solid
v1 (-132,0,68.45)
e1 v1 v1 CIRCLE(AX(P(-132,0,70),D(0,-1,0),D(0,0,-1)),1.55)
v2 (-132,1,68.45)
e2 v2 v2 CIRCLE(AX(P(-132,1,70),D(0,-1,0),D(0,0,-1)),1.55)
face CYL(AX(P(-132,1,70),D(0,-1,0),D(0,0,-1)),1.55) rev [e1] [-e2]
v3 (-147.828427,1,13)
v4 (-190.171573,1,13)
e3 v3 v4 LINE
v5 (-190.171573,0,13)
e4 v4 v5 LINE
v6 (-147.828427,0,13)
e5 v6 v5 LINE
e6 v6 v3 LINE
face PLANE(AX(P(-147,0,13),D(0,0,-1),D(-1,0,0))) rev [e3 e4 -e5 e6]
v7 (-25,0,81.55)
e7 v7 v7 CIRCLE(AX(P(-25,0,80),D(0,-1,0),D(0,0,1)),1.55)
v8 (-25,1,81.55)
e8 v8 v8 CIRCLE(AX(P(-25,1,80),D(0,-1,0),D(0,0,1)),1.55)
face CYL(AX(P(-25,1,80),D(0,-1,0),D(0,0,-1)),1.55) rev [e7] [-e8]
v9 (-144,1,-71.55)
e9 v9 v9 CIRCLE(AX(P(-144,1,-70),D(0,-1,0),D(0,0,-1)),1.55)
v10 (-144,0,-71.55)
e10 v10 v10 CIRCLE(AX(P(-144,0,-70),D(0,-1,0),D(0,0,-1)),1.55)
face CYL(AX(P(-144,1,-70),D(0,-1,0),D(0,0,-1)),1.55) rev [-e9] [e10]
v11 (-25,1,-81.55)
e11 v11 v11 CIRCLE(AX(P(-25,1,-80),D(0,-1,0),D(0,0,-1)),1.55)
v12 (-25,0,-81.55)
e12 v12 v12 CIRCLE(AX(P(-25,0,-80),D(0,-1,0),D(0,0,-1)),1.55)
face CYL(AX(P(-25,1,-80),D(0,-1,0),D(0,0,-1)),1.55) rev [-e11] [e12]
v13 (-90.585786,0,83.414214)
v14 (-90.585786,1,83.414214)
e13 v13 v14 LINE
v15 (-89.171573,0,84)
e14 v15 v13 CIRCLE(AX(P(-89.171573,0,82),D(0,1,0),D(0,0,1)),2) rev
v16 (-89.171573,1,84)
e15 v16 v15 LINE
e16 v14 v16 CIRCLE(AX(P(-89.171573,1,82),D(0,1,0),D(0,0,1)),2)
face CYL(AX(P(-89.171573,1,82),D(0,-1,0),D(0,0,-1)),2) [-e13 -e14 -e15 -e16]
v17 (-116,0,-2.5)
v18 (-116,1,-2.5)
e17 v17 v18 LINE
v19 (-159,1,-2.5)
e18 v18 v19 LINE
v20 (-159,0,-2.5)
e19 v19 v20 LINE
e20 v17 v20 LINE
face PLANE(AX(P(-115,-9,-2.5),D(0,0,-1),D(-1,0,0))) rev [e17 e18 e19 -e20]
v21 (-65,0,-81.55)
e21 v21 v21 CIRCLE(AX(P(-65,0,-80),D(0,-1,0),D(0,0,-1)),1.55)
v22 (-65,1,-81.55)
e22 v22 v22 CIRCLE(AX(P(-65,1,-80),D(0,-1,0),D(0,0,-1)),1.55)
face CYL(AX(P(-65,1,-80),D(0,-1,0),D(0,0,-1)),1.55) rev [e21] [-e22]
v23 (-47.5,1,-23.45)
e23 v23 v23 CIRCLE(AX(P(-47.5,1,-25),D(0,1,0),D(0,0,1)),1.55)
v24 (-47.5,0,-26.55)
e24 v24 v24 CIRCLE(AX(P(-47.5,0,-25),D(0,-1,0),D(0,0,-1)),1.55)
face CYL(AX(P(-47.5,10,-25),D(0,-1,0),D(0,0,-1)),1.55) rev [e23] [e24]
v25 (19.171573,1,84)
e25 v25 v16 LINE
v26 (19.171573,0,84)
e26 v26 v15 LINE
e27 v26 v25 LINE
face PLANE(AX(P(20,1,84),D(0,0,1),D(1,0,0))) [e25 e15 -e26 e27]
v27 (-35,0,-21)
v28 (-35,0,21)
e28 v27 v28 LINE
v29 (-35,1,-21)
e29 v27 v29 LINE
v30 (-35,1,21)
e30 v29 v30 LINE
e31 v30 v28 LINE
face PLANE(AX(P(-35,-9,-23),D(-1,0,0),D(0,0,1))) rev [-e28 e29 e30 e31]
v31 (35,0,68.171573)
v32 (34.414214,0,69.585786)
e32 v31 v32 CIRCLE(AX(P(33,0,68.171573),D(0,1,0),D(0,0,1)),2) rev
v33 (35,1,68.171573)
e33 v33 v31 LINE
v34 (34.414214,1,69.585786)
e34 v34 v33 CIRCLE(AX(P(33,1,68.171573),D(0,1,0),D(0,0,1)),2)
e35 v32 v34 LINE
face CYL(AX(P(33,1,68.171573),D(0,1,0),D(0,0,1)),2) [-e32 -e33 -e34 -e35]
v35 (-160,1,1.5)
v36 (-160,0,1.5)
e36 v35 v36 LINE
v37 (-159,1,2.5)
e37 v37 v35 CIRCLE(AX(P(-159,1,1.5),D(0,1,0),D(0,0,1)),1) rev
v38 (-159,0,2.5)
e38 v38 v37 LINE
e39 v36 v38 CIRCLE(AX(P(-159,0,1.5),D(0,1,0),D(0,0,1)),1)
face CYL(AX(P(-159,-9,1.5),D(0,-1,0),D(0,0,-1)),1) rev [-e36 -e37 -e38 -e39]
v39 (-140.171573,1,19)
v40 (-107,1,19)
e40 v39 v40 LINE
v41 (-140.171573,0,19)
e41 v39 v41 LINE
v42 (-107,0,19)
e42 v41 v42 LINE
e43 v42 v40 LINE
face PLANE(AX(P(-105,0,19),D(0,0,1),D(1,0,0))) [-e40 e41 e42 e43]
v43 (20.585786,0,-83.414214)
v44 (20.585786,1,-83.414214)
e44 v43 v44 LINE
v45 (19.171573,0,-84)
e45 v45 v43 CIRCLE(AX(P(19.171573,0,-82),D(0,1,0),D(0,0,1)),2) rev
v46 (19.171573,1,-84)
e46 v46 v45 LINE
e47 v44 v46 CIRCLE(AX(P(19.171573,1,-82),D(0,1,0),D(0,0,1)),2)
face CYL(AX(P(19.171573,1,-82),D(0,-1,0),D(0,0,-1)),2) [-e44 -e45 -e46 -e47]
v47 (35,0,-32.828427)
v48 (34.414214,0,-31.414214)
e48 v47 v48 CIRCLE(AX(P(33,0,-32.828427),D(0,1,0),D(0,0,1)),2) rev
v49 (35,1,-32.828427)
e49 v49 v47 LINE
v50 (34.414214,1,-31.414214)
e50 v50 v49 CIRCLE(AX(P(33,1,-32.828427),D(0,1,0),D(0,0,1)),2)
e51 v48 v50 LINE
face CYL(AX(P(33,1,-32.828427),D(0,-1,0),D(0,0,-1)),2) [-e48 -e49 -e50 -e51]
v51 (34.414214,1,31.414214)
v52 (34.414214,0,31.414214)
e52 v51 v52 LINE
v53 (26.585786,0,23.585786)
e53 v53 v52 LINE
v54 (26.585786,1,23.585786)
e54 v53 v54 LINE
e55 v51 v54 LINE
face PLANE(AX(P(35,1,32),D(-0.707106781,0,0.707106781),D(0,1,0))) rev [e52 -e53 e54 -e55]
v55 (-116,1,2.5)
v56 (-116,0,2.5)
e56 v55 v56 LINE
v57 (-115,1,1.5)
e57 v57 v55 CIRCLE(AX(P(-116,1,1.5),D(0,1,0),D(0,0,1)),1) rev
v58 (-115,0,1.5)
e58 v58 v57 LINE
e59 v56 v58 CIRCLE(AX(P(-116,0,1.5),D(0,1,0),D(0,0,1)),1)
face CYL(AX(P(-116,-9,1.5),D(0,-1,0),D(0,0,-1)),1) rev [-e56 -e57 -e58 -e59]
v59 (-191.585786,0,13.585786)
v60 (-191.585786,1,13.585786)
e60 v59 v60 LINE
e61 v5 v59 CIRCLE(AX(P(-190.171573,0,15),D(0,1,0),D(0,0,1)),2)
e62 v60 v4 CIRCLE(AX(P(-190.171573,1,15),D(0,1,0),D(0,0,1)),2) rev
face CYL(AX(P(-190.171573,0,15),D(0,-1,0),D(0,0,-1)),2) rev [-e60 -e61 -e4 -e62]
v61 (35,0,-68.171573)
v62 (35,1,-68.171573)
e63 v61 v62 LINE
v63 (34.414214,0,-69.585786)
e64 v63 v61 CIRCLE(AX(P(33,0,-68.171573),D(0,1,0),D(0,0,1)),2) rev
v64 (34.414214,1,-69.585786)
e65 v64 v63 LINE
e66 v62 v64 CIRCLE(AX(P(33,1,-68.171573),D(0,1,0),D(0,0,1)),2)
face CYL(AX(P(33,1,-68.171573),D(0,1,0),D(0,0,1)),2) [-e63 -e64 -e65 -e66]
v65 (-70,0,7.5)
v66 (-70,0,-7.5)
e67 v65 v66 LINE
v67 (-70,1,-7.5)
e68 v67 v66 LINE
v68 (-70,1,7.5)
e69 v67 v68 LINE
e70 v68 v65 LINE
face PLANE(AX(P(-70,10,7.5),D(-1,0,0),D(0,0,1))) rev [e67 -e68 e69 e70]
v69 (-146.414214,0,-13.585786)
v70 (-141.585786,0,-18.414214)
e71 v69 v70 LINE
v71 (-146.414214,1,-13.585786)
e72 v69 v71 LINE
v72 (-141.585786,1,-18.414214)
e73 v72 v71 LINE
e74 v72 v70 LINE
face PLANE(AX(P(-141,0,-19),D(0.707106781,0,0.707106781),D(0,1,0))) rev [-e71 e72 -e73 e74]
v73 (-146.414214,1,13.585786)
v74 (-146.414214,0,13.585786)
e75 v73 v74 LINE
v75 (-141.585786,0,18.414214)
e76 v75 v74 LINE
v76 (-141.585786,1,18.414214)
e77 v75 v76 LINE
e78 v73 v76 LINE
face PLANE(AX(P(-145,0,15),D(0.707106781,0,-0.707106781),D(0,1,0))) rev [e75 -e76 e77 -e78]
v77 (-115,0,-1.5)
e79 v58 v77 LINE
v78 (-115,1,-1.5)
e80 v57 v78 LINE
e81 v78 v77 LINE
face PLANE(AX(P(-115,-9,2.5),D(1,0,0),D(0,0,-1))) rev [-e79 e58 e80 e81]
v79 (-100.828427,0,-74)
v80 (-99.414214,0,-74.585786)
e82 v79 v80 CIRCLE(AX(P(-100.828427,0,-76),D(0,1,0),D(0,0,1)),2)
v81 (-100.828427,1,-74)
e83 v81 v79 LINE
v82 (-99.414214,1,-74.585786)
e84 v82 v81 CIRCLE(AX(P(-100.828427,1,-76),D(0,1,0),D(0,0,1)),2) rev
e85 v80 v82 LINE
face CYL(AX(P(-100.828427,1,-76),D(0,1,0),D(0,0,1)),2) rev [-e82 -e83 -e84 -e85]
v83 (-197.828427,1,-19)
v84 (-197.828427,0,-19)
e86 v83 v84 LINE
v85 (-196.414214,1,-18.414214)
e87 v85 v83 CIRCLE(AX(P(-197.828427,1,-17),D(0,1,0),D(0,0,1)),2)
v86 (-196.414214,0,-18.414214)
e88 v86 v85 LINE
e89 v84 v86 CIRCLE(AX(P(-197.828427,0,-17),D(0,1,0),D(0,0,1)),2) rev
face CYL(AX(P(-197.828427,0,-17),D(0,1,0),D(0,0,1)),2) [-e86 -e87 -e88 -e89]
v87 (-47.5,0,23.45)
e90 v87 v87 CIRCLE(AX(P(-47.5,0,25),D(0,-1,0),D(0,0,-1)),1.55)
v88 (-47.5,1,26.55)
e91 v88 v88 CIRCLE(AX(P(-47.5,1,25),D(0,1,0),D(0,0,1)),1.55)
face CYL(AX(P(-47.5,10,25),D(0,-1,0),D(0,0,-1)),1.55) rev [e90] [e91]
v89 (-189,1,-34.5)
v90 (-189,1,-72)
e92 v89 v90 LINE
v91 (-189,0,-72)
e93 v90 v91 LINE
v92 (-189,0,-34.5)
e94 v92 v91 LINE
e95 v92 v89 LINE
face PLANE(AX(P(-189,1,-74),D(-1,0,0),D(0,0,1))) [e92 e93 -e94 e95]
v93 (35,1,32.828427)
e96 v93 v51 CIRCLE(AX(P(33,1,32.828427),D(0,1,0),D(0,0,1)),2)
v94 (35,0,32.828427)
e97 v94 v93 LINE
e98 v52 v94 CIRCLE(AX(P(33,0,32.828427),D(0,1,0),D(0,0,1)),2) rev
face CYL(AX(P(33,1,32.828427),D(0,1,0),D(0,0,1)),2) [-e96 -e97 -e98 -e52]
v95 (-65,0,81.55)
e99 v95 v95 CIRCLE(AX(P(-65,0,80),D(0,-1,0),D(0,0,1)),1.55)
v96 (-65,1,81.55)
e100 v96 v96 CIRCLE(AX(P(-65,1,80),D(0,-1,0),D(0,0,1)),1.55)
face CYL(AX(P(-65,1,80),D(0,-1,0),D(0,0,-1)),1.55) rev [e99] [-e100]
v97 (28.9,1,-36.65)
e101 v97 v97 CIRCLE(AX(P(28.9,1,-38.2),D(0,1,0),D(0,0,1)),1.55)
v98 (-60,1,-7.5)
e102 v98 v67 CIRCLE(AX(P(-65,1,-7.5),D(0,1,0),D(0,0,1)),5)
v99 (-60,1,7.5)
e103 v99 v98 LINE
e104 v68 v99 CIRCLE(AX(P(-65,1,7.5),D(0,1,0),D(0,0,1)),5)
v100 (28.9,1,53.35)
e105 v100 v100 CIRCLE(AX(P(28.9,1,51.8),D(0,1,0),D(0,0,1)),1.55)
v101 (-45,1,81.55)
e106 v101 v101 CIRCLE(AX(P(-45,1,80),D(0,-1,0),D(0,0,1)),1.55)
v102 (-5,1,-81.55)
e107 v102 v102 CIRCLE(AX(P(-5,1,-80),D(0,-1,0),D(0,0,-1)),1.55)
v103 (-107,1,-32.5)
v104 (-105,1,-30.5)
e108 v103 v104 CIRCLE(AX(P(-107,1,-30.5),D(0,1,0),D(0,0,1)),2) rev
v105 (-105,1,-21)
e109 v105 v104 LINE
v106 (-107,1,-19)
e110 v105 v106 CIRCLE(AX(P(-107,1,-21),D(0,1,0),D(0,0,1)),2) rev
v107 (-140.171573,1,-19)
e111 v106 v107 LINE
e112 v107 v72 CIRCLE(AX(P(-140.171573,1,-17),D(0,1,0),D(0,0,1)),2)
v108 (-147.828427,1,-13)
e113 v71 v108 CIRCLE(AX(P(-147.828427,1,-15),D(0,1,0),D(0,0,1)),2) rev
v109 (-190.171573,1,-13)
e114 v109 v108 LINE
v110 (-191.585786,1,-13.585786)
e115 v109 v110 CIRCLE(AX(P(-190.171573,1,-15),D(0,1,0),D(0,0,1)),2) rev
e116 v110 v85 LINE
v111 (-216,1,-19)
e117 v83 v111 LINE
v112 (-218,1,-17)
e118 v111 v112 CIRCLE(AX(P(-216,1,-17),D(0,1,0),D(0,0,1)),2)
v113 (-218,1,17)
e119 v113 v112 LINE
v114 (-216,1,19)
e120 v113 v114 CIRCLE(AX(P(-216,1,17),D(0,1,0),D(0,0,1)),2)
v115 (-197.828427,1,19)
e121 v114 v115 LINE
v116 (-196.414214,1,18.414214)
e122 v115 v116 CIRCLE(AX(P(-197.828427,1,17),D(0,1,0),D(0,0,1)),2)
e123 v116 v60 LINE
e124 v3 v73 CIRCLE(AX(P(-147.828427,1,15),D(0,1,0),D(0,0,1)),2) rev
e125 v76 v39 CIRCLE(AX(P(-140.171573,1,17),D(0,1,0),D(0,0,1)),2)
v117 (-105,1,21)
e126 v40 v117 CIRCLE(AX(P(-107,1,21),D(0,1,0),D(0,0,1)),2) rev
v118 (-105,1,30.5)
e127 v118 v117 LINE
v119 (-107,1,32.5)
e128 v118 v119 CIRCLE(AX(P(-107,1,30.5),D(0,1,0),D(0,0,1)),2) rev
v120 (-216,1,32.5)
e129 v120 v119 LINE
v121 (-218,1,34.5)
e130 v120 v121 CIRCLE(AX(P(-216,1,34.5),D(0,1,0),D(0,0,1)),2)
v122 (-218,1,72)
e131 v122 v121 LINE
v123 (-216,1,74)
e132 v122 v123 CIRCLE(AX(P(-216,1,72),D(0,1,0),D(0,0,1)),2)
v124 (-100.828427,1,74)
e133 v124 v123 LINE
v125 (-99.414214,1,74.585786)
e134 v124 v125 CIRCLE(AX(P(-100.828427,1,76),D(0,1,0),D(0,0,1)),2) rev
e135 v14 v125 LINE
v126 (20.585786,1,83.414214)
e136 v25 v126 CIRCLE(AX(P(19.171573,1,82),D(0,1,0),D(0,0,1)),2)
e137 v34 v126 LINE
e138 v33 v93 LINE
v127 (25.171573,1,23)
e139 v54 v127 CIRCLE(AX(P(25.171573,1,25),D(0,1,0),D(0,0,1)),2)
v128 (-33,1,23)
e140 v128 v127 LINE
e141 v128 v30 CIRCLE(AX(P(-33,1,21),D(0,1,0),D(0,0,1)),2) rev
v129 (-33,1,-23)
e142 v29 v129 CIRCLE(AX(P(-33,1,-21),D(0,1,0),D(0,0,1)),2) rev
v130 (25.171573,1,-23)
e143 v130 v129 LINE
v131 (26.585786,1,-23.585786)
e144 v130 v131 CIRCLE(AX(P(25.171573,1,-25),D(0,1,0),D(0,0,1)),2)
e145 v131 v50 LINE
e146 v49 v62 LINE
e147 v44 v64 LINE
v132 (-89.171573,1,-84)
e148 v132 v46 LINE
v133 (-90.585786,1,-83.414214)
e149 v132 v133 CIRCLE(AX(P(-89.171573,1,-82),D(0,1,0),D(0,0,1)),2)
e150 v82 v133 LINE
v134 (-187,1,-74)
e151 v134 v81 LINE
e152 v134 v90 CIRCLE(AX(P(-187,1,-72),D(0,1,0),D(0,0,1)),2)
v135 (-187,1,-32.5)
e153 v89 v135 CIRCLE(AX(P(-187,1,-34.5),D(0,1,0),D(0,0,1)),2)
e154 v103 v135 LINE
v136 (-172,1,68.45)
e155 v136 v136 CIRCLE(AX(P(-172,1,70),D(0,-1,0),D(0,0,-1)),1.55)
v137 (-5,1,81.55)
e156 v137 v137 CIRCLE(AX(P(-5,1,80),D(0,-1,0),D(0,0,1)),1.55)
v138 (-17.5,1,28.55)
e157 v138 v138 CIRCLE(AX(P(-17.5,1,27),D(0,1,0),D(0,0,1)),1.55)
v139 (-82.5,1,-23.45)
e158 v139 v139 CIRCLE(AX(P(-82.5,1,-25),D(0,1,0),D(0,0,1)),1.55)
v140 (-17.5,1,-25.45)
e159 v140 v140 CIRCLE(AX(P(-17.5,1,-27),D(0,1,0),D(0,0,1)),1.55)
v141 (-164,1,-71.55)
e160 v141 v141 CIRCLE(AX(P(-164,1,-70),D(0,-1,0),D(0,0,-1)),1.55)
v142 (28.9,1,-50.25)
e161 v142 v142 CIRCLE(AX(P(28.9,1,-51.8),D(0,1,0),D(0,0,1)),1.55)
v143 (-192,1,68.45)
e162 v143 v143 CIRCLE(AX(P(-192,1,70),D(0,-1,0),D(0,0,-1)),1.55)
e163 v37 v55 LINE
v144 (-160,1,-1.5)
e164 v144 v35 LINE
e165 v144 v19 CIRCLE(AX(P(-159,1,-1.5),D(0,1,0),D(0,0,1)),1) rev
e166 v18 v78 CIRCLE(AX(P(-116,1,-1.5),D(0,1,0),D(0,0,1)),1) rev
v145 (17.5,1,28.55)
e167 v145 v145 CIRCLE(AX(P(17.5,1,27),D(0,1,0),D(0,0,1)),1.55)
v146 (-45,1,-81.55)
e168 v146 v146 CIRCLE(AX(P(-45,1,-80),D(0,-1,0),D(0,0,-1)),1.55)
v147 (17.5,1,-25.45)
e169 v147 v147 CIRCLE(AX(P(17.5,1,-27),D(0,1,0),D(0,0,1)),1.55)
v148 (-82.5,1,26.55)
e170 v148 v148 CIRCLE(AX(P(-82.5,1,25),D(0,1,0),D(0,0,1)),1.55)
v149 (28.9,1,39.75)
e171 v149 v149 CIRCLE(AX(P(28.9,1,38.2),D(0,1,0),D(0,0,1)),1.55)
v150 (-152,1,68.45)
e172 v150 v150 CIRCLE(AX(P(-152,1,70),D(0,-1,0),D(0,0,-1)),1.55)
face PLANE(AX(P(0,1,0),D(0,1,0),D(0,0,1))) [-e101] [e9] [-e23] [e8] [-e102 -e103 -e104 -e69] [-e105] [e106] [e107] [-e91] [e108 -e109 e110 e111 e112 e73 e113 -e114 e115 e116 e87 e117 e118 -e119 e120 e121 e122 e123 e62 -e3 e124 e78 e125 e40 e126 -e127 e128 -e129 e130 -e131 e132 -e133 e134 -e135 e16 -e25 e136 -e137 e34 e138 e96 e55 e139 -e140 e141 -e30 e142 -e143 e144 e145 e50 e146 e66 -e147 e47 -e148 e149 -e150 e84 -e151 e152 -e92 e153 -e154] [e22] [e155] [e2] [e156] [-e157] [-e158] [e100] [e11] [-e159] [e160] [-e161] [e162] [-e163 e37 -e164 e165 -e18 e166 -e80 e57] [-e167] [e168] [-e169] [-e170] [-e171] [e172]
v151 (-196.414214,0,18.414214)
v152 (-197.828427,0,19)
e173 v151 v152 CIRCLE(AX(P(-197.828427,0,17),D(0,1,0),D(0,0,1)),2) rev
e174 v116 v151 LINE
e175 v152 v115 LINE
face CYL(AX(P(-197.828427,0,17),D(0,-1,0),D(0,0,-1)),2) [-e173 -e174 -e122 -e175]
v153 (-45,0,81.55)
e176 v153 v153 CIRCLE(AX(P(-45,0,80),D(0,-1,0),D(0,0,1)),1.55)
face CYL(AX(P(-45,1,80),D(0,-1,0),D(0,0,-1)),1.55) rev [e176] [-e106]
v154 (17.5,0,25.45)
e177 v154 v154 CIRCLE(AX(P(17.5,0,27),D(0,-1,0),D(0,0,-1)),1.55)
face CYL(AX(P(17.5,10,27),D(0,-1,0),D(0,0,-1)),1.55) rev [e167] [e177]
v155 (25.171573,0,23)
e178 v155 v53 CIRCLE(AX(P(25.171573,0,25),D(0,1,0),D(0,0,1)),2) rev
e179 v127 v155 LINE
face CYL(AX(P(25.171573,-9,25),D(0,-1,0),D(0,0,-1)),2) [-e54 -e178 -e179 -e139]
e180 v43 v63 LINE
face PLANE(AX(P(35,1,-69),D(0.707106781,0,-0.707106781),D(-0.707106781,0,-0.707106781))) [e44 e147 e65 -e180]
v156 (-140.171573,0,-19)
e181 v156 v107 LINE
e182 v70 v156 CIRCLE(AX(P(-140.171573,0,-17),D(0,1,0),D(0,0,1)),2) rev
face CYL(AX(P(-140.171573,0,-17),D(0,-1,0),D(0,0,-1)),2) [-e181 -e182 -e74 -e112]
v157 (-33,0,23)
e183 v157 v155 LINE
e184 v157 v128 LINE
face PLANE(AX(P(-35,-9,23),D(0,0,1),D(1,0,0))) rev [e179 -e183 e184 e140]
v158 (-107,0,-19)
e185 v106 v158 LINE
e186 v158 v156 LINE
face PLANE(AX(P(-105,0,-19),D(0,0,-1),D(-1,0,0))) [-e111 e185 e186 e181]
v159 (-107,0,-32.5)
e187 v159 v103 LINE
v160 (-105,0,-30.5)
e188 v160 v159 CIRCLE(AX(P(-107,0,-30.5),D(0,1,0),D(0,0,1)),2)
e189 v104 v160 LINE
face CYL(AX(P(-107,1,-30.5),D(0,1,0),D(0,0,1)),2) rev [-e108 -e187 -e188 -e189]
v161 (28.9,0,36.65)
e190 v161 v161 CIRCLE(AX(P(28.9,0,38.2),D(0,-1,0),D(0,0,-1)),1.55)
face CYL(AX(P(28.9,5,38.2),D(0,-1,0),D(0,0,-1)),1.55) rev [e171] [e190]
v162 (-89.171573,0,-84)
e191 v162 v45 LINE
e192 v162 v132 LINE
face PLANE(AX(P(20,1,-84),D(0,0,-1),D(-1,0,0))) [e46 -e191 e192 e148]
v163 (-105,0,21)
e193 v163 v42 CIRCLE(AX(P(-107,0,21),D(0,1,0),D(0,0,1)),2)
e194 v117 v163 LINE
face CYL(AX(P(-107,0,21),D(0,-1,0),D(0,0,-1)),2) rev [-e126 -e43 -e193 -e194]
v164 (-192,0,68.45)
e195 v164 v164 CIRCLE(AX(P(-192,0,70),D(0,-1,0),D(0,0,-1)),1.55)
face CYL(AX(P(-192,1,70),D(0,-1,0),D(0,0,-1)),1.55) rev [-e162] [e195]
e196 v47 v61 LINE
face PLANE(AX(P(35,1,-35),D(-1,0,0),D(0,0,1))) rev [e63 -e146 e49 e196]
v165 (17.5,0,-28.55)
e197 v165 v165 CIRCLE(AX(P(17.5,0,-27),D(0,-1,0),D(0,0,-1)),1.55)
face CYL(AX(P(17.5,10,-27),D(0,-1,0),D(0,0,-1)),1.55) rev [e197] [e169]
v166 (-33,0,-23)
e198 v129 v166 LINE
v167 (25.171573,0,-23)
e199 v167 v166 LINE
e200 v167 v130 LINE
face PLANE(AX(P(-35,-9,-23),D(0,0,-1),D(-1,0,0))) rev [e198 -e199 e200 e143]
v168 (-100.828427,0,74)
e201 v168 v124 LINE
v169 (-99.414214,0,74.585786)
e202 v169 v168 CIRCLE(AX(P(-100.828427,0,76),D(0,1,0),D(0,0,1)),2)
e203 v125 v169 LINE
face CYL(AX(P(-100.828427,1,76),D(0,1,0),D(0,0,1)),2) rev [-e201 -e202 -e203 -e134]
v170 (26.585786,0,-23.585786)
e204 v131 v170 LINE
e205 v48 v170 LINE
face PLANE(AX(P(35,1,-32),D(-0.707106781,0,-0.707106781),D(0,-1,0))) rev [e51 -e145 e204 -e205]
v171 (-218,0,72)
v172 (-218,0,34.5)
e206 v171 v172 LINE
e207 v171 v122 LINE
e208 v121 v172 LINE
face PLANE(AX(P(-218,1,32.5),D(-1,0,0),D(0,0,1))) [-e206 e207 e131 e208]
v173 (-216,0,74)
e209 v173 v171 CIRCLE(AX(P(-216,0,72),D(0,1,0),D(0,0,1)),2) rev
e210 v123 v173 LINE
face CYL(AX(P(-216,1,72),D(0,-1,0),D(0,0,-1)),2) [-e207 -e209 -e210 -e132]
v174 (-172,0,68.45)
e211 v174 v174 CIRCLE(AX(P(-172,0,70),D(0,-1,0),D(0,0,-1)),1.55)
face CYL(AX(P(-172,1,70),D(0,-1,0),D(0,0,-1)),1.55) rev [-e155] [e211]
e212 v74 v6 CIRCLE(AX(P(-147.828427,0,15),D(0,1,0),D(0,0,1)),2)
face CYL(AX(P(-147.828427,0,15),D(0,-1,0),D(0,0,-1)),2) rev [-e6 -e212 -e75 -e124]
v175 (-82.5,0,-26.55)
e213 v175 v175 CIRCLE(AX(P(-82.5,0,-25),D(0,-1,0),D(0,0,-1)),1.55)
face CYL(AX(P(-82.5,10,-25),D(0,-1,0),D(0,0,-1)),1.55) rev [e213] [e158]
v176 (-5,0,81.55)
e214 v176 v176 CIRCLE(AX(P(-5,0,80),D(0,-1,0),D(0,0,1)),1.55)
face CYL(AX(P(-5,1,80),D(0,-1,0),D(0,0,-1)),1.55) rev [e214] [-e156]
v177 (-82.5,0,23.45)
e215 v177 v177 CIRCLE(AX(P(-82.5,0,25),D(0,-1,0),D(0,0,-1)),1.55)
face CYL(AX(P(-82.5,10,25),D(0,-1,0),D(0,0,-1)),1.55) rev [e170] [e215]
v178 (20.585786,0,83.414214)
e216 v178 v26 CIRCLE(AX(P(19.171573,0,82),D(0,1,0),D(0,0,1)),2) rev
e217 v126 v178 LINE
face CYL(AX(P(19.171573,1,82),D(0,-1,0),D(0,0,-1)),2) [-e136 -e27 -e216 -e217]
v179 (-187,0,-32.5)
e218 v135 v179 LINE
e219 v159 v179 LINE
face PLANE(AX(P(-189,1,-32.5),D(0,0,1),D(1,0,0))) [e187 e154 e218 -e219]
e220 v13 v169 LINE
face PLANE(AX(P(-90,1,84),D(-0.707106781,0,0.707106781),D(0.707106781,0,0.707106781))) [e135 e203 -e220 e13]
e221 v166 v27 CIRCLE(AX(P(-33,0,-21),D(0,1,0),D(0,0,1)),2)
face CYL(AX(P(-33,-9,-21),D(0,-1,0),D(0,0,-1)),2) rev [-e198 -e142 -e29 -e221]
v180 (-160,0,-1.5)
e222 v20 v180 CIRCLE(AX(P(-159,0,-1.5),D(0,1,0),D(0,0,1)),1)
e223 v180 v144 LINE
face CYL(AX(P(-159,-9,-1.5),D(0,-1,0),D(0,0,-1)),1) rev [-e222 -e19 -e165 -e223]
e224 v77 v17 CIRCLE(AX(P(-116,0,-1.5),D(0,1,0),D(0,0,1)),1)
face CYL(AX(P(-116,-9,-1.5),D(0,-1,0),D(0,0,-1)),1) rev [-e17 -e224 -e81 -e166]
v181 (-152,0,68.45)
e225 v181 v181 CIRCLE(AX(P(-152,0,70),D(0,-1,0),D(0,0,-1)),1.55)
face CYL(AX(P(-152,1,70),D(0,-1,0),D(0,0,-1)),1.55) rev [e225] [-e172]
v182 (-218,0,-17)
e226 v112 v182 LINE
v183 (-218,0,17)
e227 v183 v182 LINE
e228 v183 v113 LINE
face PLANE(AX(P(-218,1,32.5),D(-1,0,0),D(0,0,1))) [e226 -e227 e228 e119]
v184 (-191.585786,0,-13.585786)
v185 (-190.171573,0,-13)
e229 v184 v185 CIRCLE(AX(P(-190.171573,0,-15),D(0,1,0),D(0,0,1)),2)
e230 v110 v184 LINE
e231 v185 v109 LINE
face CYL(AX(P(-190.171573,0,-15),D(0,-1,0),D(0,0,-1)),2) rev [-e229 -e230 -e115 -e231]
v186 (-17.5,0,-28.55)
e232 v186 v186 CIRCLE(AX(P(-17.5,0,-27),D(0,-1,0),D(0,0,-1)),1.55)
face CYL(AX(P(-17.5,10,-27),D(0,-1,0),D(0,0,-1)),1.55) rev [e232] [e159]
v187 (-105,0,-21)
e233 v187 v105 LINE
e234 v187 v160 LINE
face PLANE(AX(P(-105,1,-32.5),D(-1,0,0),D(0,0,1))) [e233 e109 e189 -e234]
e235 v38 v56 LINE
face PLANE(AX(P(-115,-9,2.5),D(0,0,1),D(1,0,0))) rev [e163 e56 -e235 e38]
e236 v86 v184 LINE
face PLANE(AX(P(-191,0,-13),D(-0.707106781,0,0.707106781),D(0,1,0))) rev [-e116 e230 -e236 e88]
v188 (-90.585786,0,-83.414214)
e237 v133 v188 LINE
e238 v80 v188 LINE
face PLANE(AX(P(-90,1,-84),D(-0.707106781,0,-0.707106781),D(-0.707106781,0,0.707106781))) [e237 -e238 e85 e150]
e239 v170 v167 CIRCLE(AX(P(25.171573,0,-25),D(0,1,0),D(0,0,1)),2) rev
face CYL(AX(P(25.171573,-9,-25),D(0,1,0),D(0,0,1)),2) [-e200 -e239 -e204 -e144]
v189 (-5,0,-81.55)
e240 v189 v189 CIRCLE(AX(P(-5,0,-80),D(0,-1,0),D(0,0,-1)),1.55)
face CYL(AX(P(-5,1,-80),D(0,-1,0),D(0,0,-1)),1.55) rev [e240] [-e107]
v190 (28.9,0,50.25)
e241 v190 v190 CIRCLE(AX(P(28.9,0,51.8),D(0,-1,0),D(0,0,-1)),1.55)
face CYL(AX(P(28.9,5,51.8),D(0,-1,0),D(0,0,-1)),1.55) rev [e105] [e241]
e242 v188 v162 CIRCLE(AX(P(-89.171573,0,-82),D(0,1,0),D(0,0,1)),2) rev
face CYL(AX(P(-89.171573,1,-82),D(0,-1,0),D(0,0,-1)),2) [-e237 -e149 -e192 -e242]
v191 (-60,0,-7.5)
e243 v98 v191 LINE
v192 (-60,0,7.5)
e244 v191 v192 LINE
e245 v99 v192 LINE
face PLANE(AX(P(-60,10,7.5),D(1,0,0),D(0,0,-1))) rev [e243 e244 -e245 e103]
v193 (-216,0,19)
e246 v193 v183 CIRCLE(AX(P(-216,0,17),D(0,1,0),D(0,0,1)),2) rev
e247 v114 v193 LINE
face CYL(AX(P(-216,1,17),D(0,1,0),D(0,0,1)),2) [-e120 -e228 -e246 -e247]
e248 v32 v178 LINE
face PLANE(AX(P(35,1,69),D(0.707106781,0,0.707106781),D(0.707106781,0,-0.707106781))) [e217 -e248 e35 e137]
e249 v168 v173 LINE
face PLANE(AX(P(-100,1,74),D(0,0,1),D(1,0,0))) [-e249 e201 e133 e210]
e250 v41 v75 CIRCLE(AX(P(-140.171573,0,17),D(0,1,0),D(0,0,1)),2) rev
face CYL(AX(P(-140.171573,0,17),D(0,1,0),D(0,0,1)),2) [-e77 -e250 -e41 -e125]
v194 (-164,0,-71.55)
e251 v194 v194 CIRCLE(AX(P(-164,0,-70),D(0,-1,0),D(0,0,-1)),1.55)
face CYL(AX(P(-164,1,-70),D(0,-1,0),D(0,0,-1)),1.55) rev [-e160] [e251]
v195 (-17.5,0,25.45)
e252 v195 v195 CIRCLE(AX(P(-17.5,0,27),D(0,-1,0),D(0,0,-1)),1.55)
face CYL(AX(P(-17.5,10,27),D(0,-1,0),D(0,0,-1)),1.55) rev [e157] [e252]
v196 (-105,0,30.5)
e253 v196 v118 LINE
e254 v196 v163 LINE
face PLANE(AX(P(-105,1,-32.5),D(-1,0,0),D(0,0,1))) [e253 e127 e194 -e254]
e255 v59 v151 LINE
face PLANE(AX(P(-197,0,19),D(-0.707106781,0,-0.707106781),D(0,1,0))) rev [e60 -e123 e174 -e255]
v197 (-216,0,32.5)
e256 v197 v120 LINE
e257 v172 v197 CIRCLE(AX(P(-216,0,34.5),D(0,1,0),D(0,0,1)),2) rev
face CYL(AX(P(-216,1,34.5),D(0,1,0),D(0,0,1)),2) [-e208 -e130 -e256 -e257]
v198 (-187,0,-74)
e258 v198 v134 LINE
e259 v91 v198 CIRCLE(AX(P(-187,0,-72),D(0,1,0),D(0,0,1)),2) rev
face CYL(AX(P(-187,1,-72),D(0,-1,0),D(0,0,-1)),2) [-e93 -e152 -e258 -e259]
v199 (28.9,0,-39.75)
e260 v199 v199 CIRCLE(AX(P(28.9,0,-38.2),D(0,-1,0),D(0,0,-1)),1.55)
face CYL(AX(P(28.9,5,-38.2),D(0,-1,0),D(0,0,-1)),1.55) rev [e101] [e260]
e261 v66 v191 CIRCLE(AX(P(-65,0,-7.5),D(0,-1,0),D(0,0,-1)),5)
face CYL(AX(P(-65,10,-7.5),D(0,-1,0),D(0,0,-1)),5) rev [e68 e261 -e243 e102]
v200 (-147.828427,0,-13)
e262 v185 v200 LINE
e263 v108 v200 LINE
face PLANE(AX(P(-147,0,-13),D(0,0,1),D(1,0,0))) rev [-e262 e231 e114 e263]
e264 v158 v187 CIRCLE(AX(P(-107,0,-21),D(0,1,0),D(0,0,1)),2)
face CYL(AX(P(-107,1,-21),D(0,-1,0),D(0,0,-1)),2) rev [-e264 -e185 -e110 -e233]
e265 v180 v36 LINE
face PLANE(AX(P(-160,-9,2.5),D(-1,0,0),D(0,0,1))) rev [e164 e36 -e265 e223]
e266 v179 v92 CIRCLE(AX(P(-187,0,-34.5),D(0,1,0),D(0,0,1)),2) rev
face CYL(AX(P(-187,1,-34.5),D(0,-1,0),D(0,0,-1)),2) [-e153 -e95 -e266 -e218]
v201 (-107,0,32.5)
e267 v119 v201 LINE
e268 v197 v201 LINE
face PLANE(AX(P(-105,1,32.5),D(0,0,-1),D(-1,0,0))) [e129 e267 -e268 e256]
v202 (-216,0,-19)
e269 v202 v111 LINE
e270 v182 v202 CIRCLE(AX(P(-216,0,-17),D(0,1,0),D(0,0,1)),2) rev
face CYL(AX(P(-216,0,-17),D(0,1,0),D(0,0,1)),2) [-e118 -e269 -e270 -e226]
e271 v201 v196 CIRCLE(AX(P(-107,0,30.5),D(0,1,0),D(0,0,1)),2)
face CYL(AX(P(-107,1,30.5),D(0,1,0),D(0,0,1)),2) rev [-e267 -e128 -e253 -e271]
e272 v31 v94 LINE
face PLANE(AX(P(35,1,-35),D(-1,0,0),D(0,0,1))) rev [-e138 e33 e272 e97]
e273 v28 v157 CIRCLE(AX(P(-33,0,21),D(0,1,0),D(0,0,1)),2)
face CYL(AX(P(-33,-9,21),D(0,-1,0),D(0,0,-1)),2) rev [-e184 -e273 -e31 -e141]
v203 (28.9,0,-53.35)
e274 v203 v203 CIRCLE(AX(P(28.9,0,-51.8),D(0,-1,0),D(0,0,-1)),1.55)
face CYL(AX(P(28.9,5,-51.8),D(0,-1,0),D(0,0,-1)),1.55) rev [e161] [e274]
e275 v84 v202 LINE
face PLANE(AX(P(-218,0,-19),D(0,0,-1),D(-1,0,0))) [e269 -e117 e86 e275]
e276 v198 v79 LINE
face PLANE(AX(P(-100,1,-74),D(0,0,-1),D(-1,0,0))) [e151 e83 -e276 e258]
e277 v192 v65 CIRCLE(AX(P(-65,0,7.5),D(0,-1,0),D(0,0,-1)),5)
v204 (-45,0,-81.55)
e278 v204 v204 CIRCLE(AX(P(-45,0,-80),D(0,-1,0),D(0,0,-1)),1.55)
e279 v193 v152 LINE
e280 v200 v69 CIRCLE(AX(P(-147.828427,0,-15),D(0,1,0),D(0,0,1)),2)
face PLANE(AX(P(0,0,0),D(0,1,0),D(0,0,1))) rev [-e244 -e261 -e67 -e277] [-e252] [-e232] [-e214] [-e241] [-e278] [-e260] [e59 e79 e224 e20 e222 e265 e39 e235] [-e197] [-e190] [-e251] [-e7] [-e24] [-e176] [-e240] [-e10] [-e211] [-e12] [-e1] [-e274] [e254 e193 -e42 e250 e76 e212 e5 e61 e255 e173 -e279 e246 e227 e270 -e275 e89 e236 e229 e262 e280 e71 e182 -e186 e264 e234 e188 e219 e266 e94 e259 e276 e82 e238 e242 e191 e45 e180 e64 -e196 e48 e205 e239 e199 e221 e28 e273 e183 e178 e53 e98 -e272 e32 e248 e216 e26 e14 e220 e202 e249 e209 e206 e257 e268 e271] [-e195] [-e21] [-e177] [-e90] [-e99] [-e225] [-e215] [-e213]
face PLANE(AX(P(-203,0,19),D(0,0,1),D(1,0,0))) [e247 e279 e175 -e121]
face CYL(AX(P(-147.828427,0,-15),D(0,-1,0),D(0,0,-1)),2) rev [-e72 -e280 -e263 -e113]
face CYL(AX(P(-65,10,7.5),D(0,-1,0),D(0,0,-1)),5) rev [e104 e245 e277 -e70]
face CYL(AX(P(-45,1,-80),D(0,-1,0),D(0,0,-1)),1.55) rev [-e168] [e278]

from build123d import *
from build123d.topology import SkipClean

# Parameters (mm, degrees)
SKETCH_1_W          = 70
SKETCH_1_H          = 70
SKETCH_1_R          = 1.6
EXTRUDE_1_DEPTH     = 1
EXTRUDE_2_DEPTH     = 1
SKETCH_5_W          = 113
SKETCH_5_H          = 30
EXTRUDE_5_DEPTH     = 1
SKETCH_6_R          = 1.55
CUT_EXTRUDE_1_DEPTH = 1
SKETCH_7_W          = 15
SKETCH_7_H          = 17.5
EXTRUDE_6_DEPTH     = 1
SKETCH_8_W          = 40
SKETCH_8_H          = 4
SKETCH_8_W_2        = 12
SKETCH_8_W_3        = 27
EXTRUDE_7_DEPTH     = 1
CHAMFER_1_SIZE      = 4
SKETCH_9_W          = 15
SKETCH_9_H          = 13.5
CUT_EXTRUDE_2_DEPTH = 1
CHAMFER_2_SIZE      = 6
SKETCH_10_W         = 45
SKETCH_10_H         = 5
SKETCH_10_W_2       = 70
SKETCH_10_H_2       = 46
CUT_EXTRUDE_3_DEPTH = 10
FILLET_1_R          = 1
SKETCH_11_R         = 1.55
CUT_EXTRUDE_4_DEPTH = 10
CHAMFER_3_SIZE      = 9
FILLET_2_R          = 2
SKETCH_12_R         = 1.55
CUT_EXTRUDE_5_DEPTH = 5
CUT_EXTRUDE_6_DEPTH = 10


# Some blends are built 0.0001 mm under size
with BuildPart() as part:
    # 草图1 → 凸台-拉伸1 (new body)
    with BuildSketch(Plane(origin=(0, 0, 0), x_dir=(1, 0, 0), z_dir=(0, 1, 0))):
        Rectangle(SKETCH_1_W, SKETCH_1_H)
        with Locations(Location((13, -13, 0), (0, 0, 270))):
            Circle(SKETCH_1_R, mode=Mode.SUBTRACT)
        with Locations(Location((13, 13, 0), (0, 0, 270))):
            Circle(SKETCH_1_R, mode=Mode.SUBTRACT)
        with Locations(Location((-13, 13, 0), (0, 0, 270))):
            Circle(SKETCH_1_R, mode=Mode.SUBTRACT)
        with Locations(Location((-13, -13, 0), (0, 0, 270))):
            Circle(SKETCH_1_R, mode=Mode.SUBTRACT)
    extrude(amount=EXTRUDE_1_DEPTH)

    # 草图2 → 凸台-拉伸2 (add)
    with BuildSketch(Plane.XZ):
        Polygon((35, -35), (35, -69), (20, -84), (-90, -84), (-100, -74), (-189, -74), (-189, -32.5), (-105, -32.5), (-105, 32.5), (-218, 32.5), (-218, 74), (-100, 74), (-90, 84), (20, 84), (35, 69), (35, 35), (-35, 35), (-35, -35), align=None)
    extrude(amount=-EXTRUDE_2_DEPTH)

    # 草图5 → 凸台-拉伸5 (add)
    with BuildSketch(Plane(origin=(0, 1, 0), x_dir=(1, 0, 0), z_dir=(0, 1, 0))):
        with Locations((-161.5, 0)):
            Rectangle(SKETCH_5_W, SKETCH_5_H)
    extrude(amount=-EXTRUDE_5_DEPTH)

    # 草图6 → 切除-拉伸1 (cut)
    with BuildSketch(Plane.XZ):
        with Locations(Location((-5, -80, 0), (0, 0, 270))):
            Circle(SKETCH_6_R)
        with Locations(Location((-25, -80, 0), (0, 0, 270))):
            Circle(SKETCH_6_R)
        with Locations(Location((-65, -80, 0), (0, 0, 270))):
            Circle(SKETCH_6_R)
        with Locations(Location((-45, -80, 0), (0, 0, 270))):
            Circle(SKETCH_6_R)
        with Locations(Location((-45, 80, 0), (0, 0, 90))):
            Circle(SKETCH_6_R)
        with Locations(Location((-65, 80, 0), (0, 0, 90))):
            Circle(SKETCH_6_R)
        with Locations(Location((-25, 80, 0), (0, 0, 90))):
            Circle(SKETCH_6_R)
        with Locations(Location((-5, 80, 0), (0, 0, 90))):
            Circle(SKETCH_6_R)
        with Locations(Location((-164, -70, 0), (0, 0, 270))):
            Circle(SKETCH_6_R)
        with Locations(Location((-192, 70, 0), (0, 0, 270))):
            Circle(SKETCH_6_R)
        with Locations(Location((-172, 70, 0), (0, 0, 270))):
            Circle(SKETCH_6_R)
        with Locations(Location((-152, 70, 0), (0, 0, 270))):
            Circle(SKETCH_6_R)
        with Locations(Location((-132, 70, 0), (0, 0, 270))):
            Circle(SKETCH_6_R)
        with Locations(Location((-144, -70, 0), (0, 0, 270))):
            Circle(SKETCH_6_R)
    extrude(amount=-CUT_EXTRUDE_1_DEPTH, mode=Mode.SUBTRACT)

    # 草图7 → 凸台-拉伸6 (add)
    with BuildSketch(Plane.XZ):
        with Locations((-210.5, 23.75)):
            Rectangle(SKETCH_7_W, SKETCH_7_H)
    extrude(amount=-EXTRUDE_6_DEPTH)

    # 草图8 → 凸台-拉伸7 (add)
    with BuildSketch(Plane(origin=(0, 1, 0), x_dir=(1, 0, 0), z_dir=(0, 1, 0))):
        with Locations((-125, 17)):
            Rectangle(SKETCH_8_W, SKETCH_8_H)
        with Locations((-125, -17)):
            Rectangle(SKETCH_8_W, SKETCH_8_H)
        with Locations((-197, -17)):
            Rectangle(SKETCH_8_W_2, SKETCH_8_H)
        with Locations((-204.5, 17)):
            Rectangle(SKETCH_8_W_3, SKETCH_8_H)
    extrude(amount=-EXTRUDE_7_DEPTH)

    # 倒角1
    chamfer_1_edges = [part.edges().sort_by_distance(p)[0] for p in [
        (-145, 0.5, -19),
        (-145, 0.5, 19),
    ]]
    chamfer(chamfer_1_edges, length=CHAMFER_1_SIZE - 0.0001)  # a hair under: the kernel refuses the full size

    # 草图9 → 切除-拉伸2 (cut)
    with SkipClean():  # the faces are left unmerged after this step: merging them gives an invalid solid
        with BuildSketch(Plane(origin=(0, 1, 0), x_dir=(1, 0, 0), z_dir=(0, 1, 0))):
            with Locations((-210.5, -25.75)):
                Rectangle(SKETCH_9_W, SKETCH_9_H)
            Polygon((-145, -15), (-147, -13), (-191, -13), (-191, -15), align=None)
            Polygon((-145, 15), (-191, 15), (-191, 13), (-147, 13), align=None)
        extrude(amount=-CUT_EXTRUDE_2_DEPTH, mode=Mode.SUBTRACT)

    # 倒角2
    # the kernel refuses this chamfer: 6 mm, written as the material it takes off along each edge
    with BuildSketch(Plane(origin=(-191, 16.430097928, -19), x_dir=(0.027495876610586775, 0, 0.9996219169112968), z_dir=(0, -1, 0))) as chamfer_2_piece_1_section:
        Polygon((CHAMFER_2_SIZE * 0.999621916911, CHAMFER_2_SIZE * 0.0274958766106), (-CHAMFER_2_SIZE * 0.0274958766106, CHAMFER_2_SIZE * 0.999621916911), (0, 0), align=None)
    chamfer_2_piece_1 = extrude(amount=31.860195856, mode=Mode.PRIVATE)
    chamfer_2_piece_1 = split(chamfer_2_piece_1, bisect_by=Plane(origin=(-192.982424926, 0.5, -13), z_dir=(0, 0, -1)), keep=Keep.TOP, mode=Mode.PRIVATE)
    add(chamfer_2_piece_1, mode=Mode.SUBTRACT)
    with BuildSketch(Plane(origin=(-191, 16.430097928, 19), x_dir=(-0.9996219169112968, 0, 0.02749587661058619), z_dir=(0, -1, 0))) as chamfer_2_piece_2_section:
        Polygon((CHAMFER_2_SIZE * 0.999621916911, CHAMFER_2_SIZE * 0.0274958766106), (-CHAMFER_2_SIZE * 0.0274958766106, CHAMFER_2_SIZE * 0.999621916911), (0, 0), align=None)
    chamfer_2_piece_2 = extrude(amount=31.860195856, mode=Mode.PRIVATE)
    chamfer_2_piece_2 = split(chamfer_2_piece_2, bisect_by=Plane(origin=(-192.982424926, 0.5, 13), z_dir=(0, 0, 1)), keep=Keep.TOP, mode=Mode.PRIVATE)
    add(chamfer_2_piece_2, mode=Mode.SUBTRACT)

    # 草图10 → 切除-拉伸3 (cut)
    with SkipClean():  # the faces are left unmerged after this step: merging them gives an invalid solid
        with BuildSketch(Plane(origin=(0, 1, 0), x_dir=(1, 0, 0), z_dir=(0, 1, 0))):
            with Locations((-137.5, 0)):
                Rectangle(SKETCH_10_W, SKETCH_10_H)
            Rectangle(SKETCH_10_W_2, SKETCH_10_H_2)
        extrude(amount=-CUT_EXTRUDE_3_DEPTH, mode=Mode.SUBTRACT)

    # 圆角1
    fillet_1_edges = [part.edges().sort_by_distance(p)[0] for p in [
        (-115, 0.5, -2.5),
        (-115, 0.5, 2.5),
        (-160, 0.5, 2.5),
        (-160, 0.5, -2.5),
    ]]
    fillet(fillet_1_edges, radius=FILLET_1_R)

    # 草图11 → 切除-拉伸4 (cut)
    with SkipClean():  # the faces are left unmerged after this step: merging them gives an invalid solid
        with BuildSketch(Plane.XZ):
            with Locations(Location((17.5, -27, 0), (0, 0, 270))):
                Circle(SKETCH_11_R)
            with Locations(Location((17.5, 27, 0), (0, 0, 270))):
                Circle(SKETCH_11_R)
            with Locations(Location((-17.5, 27, 0), (0, 0, 270))):
                Circle(SKETCH_11_R)
            with Locations(Location((-17.5, -27, 0), (0, 0, 270))):
                Circle(SKETCH_11_R)
            with Locations(Location((-47.5, 25, 0), (0, 0, 270))):
                Circle(SKETCH_11_R)
            with Locations(Location((-47.5, -25, 0), (0, 0, 270))):
                Circle(SKETCH_11_R)
            with Locations(Location((-82.5, -25, 0), (0, 0, 270))):
                Circle(SKETCH_11_R)
            with Locations(Location((-82.5, 25, 0), (0, 0, 270))):
                Circle(SKETCH_11_R)
        extrude(amount=-CUT_EXTRUDE_4_DEPTH, mode=Mode.SUBTRACT)

    # 倒角3
    chamfer_3_edges = [part.edges().sort_by_distance(p)[0] for p in [
        (35, 0.5, -23),
        (35, 0.5, 23),
    ]]
    chamfer(chamfer_3_edges, length=CHAMFER_3_SIZE)

    # 圆角2
    fillet_2_edges = [part.edges().sort_by_distance(p)[0] for p in [
        (-105, 0.5, -19),
        (-105, 0.5, 19),
        (-218, 0.5, -19),
        (-141.0001, 0.5, -19),
        (-141.0001, 0.5, 19),
        (-218, 0.5, 32.5),
        (-218, 0.5, 19),
        (-191, 0.5, 13),
        (-147, 0.5, 13),
        (-147, 0.5, -13),
        (-191, 0.5, -13),
        (-197, 0.5, -19),
        (-197, 0.5, 19),
        (35, 0.5, -69),
        (20, 0.5, -84),
        (-90, 0.5, -84),
        (-100, 0.5, -74),
        (-189, 0.5, -74),
        (-35, 0.5, 23),
        (-35, 0.5, -23),
        (-189, 0.5, -32.5),
        (-105, 0.5, -32.5),
        (-105, 0.5, 32.5),
        (-218, 0.5, 74),
        (-100, 0.5, 74),
        (-90, 0.5, 84),
        (20, 0.5, 84),
        (35, 0.5, 69),
        (35, 0.5, 32),
        (26, 0.5, 23),
        (35, 0.5, -32),
        (26, 0.5, -23),
    ]]
    fillet(fillet_2_edges, radius=FILLET_2_R)

    # 草图12 → 切除-拉伸5 (cut)
    with SkipClean():  # the faces are left unmerged after this step: merging them gives an invalid solid
        with BuildSketch(Plane.XZ):
            with Locations(Location((28.9, 38.2, 0), (0, 0, 270))):
                Circle(SKETCH_12_R)
            with Locations(Location((28.9, 51.8, 0), (0, 0, 270))):
                Circle(SKETCH_12_R)
            with Locations(Location((28.9, -38.2, 0), (0, 0, 270))):
                Circle(SKETCH_12_R)
            with Locations(Location((28.9, -51.8, 0), (0, 0, 270))):
                Circle(SKETCH_12_R)
        extrude(amount=-CUT_EXTRUDE_5_DEPTH, mode=Mode.SUBTRACT)

    # 草图13 → 切除-拉伸6 (cut)
    with SkipClean():  # the faces are left unmerged after this step: merging them gives an invalid solid
        with BuildSketch(Plane.XZ):
            with BuildLine():
                Line((-60, 7.5), (-60, -7.5))
                ThreePointArc((-60, -7.5), (-65, -12.5), (-70, -7.5))
                Line((-70, -7.5), (-70, 7.5))
                ThreePointArc((-70, 7.5), (-65, 12.5), (-60, 7.5))
            make_face()
        extrude(amount=-CUT_EXTRUDE_6_DEPTH, mode=Mode.SUBTRACT)


solid = part.part
